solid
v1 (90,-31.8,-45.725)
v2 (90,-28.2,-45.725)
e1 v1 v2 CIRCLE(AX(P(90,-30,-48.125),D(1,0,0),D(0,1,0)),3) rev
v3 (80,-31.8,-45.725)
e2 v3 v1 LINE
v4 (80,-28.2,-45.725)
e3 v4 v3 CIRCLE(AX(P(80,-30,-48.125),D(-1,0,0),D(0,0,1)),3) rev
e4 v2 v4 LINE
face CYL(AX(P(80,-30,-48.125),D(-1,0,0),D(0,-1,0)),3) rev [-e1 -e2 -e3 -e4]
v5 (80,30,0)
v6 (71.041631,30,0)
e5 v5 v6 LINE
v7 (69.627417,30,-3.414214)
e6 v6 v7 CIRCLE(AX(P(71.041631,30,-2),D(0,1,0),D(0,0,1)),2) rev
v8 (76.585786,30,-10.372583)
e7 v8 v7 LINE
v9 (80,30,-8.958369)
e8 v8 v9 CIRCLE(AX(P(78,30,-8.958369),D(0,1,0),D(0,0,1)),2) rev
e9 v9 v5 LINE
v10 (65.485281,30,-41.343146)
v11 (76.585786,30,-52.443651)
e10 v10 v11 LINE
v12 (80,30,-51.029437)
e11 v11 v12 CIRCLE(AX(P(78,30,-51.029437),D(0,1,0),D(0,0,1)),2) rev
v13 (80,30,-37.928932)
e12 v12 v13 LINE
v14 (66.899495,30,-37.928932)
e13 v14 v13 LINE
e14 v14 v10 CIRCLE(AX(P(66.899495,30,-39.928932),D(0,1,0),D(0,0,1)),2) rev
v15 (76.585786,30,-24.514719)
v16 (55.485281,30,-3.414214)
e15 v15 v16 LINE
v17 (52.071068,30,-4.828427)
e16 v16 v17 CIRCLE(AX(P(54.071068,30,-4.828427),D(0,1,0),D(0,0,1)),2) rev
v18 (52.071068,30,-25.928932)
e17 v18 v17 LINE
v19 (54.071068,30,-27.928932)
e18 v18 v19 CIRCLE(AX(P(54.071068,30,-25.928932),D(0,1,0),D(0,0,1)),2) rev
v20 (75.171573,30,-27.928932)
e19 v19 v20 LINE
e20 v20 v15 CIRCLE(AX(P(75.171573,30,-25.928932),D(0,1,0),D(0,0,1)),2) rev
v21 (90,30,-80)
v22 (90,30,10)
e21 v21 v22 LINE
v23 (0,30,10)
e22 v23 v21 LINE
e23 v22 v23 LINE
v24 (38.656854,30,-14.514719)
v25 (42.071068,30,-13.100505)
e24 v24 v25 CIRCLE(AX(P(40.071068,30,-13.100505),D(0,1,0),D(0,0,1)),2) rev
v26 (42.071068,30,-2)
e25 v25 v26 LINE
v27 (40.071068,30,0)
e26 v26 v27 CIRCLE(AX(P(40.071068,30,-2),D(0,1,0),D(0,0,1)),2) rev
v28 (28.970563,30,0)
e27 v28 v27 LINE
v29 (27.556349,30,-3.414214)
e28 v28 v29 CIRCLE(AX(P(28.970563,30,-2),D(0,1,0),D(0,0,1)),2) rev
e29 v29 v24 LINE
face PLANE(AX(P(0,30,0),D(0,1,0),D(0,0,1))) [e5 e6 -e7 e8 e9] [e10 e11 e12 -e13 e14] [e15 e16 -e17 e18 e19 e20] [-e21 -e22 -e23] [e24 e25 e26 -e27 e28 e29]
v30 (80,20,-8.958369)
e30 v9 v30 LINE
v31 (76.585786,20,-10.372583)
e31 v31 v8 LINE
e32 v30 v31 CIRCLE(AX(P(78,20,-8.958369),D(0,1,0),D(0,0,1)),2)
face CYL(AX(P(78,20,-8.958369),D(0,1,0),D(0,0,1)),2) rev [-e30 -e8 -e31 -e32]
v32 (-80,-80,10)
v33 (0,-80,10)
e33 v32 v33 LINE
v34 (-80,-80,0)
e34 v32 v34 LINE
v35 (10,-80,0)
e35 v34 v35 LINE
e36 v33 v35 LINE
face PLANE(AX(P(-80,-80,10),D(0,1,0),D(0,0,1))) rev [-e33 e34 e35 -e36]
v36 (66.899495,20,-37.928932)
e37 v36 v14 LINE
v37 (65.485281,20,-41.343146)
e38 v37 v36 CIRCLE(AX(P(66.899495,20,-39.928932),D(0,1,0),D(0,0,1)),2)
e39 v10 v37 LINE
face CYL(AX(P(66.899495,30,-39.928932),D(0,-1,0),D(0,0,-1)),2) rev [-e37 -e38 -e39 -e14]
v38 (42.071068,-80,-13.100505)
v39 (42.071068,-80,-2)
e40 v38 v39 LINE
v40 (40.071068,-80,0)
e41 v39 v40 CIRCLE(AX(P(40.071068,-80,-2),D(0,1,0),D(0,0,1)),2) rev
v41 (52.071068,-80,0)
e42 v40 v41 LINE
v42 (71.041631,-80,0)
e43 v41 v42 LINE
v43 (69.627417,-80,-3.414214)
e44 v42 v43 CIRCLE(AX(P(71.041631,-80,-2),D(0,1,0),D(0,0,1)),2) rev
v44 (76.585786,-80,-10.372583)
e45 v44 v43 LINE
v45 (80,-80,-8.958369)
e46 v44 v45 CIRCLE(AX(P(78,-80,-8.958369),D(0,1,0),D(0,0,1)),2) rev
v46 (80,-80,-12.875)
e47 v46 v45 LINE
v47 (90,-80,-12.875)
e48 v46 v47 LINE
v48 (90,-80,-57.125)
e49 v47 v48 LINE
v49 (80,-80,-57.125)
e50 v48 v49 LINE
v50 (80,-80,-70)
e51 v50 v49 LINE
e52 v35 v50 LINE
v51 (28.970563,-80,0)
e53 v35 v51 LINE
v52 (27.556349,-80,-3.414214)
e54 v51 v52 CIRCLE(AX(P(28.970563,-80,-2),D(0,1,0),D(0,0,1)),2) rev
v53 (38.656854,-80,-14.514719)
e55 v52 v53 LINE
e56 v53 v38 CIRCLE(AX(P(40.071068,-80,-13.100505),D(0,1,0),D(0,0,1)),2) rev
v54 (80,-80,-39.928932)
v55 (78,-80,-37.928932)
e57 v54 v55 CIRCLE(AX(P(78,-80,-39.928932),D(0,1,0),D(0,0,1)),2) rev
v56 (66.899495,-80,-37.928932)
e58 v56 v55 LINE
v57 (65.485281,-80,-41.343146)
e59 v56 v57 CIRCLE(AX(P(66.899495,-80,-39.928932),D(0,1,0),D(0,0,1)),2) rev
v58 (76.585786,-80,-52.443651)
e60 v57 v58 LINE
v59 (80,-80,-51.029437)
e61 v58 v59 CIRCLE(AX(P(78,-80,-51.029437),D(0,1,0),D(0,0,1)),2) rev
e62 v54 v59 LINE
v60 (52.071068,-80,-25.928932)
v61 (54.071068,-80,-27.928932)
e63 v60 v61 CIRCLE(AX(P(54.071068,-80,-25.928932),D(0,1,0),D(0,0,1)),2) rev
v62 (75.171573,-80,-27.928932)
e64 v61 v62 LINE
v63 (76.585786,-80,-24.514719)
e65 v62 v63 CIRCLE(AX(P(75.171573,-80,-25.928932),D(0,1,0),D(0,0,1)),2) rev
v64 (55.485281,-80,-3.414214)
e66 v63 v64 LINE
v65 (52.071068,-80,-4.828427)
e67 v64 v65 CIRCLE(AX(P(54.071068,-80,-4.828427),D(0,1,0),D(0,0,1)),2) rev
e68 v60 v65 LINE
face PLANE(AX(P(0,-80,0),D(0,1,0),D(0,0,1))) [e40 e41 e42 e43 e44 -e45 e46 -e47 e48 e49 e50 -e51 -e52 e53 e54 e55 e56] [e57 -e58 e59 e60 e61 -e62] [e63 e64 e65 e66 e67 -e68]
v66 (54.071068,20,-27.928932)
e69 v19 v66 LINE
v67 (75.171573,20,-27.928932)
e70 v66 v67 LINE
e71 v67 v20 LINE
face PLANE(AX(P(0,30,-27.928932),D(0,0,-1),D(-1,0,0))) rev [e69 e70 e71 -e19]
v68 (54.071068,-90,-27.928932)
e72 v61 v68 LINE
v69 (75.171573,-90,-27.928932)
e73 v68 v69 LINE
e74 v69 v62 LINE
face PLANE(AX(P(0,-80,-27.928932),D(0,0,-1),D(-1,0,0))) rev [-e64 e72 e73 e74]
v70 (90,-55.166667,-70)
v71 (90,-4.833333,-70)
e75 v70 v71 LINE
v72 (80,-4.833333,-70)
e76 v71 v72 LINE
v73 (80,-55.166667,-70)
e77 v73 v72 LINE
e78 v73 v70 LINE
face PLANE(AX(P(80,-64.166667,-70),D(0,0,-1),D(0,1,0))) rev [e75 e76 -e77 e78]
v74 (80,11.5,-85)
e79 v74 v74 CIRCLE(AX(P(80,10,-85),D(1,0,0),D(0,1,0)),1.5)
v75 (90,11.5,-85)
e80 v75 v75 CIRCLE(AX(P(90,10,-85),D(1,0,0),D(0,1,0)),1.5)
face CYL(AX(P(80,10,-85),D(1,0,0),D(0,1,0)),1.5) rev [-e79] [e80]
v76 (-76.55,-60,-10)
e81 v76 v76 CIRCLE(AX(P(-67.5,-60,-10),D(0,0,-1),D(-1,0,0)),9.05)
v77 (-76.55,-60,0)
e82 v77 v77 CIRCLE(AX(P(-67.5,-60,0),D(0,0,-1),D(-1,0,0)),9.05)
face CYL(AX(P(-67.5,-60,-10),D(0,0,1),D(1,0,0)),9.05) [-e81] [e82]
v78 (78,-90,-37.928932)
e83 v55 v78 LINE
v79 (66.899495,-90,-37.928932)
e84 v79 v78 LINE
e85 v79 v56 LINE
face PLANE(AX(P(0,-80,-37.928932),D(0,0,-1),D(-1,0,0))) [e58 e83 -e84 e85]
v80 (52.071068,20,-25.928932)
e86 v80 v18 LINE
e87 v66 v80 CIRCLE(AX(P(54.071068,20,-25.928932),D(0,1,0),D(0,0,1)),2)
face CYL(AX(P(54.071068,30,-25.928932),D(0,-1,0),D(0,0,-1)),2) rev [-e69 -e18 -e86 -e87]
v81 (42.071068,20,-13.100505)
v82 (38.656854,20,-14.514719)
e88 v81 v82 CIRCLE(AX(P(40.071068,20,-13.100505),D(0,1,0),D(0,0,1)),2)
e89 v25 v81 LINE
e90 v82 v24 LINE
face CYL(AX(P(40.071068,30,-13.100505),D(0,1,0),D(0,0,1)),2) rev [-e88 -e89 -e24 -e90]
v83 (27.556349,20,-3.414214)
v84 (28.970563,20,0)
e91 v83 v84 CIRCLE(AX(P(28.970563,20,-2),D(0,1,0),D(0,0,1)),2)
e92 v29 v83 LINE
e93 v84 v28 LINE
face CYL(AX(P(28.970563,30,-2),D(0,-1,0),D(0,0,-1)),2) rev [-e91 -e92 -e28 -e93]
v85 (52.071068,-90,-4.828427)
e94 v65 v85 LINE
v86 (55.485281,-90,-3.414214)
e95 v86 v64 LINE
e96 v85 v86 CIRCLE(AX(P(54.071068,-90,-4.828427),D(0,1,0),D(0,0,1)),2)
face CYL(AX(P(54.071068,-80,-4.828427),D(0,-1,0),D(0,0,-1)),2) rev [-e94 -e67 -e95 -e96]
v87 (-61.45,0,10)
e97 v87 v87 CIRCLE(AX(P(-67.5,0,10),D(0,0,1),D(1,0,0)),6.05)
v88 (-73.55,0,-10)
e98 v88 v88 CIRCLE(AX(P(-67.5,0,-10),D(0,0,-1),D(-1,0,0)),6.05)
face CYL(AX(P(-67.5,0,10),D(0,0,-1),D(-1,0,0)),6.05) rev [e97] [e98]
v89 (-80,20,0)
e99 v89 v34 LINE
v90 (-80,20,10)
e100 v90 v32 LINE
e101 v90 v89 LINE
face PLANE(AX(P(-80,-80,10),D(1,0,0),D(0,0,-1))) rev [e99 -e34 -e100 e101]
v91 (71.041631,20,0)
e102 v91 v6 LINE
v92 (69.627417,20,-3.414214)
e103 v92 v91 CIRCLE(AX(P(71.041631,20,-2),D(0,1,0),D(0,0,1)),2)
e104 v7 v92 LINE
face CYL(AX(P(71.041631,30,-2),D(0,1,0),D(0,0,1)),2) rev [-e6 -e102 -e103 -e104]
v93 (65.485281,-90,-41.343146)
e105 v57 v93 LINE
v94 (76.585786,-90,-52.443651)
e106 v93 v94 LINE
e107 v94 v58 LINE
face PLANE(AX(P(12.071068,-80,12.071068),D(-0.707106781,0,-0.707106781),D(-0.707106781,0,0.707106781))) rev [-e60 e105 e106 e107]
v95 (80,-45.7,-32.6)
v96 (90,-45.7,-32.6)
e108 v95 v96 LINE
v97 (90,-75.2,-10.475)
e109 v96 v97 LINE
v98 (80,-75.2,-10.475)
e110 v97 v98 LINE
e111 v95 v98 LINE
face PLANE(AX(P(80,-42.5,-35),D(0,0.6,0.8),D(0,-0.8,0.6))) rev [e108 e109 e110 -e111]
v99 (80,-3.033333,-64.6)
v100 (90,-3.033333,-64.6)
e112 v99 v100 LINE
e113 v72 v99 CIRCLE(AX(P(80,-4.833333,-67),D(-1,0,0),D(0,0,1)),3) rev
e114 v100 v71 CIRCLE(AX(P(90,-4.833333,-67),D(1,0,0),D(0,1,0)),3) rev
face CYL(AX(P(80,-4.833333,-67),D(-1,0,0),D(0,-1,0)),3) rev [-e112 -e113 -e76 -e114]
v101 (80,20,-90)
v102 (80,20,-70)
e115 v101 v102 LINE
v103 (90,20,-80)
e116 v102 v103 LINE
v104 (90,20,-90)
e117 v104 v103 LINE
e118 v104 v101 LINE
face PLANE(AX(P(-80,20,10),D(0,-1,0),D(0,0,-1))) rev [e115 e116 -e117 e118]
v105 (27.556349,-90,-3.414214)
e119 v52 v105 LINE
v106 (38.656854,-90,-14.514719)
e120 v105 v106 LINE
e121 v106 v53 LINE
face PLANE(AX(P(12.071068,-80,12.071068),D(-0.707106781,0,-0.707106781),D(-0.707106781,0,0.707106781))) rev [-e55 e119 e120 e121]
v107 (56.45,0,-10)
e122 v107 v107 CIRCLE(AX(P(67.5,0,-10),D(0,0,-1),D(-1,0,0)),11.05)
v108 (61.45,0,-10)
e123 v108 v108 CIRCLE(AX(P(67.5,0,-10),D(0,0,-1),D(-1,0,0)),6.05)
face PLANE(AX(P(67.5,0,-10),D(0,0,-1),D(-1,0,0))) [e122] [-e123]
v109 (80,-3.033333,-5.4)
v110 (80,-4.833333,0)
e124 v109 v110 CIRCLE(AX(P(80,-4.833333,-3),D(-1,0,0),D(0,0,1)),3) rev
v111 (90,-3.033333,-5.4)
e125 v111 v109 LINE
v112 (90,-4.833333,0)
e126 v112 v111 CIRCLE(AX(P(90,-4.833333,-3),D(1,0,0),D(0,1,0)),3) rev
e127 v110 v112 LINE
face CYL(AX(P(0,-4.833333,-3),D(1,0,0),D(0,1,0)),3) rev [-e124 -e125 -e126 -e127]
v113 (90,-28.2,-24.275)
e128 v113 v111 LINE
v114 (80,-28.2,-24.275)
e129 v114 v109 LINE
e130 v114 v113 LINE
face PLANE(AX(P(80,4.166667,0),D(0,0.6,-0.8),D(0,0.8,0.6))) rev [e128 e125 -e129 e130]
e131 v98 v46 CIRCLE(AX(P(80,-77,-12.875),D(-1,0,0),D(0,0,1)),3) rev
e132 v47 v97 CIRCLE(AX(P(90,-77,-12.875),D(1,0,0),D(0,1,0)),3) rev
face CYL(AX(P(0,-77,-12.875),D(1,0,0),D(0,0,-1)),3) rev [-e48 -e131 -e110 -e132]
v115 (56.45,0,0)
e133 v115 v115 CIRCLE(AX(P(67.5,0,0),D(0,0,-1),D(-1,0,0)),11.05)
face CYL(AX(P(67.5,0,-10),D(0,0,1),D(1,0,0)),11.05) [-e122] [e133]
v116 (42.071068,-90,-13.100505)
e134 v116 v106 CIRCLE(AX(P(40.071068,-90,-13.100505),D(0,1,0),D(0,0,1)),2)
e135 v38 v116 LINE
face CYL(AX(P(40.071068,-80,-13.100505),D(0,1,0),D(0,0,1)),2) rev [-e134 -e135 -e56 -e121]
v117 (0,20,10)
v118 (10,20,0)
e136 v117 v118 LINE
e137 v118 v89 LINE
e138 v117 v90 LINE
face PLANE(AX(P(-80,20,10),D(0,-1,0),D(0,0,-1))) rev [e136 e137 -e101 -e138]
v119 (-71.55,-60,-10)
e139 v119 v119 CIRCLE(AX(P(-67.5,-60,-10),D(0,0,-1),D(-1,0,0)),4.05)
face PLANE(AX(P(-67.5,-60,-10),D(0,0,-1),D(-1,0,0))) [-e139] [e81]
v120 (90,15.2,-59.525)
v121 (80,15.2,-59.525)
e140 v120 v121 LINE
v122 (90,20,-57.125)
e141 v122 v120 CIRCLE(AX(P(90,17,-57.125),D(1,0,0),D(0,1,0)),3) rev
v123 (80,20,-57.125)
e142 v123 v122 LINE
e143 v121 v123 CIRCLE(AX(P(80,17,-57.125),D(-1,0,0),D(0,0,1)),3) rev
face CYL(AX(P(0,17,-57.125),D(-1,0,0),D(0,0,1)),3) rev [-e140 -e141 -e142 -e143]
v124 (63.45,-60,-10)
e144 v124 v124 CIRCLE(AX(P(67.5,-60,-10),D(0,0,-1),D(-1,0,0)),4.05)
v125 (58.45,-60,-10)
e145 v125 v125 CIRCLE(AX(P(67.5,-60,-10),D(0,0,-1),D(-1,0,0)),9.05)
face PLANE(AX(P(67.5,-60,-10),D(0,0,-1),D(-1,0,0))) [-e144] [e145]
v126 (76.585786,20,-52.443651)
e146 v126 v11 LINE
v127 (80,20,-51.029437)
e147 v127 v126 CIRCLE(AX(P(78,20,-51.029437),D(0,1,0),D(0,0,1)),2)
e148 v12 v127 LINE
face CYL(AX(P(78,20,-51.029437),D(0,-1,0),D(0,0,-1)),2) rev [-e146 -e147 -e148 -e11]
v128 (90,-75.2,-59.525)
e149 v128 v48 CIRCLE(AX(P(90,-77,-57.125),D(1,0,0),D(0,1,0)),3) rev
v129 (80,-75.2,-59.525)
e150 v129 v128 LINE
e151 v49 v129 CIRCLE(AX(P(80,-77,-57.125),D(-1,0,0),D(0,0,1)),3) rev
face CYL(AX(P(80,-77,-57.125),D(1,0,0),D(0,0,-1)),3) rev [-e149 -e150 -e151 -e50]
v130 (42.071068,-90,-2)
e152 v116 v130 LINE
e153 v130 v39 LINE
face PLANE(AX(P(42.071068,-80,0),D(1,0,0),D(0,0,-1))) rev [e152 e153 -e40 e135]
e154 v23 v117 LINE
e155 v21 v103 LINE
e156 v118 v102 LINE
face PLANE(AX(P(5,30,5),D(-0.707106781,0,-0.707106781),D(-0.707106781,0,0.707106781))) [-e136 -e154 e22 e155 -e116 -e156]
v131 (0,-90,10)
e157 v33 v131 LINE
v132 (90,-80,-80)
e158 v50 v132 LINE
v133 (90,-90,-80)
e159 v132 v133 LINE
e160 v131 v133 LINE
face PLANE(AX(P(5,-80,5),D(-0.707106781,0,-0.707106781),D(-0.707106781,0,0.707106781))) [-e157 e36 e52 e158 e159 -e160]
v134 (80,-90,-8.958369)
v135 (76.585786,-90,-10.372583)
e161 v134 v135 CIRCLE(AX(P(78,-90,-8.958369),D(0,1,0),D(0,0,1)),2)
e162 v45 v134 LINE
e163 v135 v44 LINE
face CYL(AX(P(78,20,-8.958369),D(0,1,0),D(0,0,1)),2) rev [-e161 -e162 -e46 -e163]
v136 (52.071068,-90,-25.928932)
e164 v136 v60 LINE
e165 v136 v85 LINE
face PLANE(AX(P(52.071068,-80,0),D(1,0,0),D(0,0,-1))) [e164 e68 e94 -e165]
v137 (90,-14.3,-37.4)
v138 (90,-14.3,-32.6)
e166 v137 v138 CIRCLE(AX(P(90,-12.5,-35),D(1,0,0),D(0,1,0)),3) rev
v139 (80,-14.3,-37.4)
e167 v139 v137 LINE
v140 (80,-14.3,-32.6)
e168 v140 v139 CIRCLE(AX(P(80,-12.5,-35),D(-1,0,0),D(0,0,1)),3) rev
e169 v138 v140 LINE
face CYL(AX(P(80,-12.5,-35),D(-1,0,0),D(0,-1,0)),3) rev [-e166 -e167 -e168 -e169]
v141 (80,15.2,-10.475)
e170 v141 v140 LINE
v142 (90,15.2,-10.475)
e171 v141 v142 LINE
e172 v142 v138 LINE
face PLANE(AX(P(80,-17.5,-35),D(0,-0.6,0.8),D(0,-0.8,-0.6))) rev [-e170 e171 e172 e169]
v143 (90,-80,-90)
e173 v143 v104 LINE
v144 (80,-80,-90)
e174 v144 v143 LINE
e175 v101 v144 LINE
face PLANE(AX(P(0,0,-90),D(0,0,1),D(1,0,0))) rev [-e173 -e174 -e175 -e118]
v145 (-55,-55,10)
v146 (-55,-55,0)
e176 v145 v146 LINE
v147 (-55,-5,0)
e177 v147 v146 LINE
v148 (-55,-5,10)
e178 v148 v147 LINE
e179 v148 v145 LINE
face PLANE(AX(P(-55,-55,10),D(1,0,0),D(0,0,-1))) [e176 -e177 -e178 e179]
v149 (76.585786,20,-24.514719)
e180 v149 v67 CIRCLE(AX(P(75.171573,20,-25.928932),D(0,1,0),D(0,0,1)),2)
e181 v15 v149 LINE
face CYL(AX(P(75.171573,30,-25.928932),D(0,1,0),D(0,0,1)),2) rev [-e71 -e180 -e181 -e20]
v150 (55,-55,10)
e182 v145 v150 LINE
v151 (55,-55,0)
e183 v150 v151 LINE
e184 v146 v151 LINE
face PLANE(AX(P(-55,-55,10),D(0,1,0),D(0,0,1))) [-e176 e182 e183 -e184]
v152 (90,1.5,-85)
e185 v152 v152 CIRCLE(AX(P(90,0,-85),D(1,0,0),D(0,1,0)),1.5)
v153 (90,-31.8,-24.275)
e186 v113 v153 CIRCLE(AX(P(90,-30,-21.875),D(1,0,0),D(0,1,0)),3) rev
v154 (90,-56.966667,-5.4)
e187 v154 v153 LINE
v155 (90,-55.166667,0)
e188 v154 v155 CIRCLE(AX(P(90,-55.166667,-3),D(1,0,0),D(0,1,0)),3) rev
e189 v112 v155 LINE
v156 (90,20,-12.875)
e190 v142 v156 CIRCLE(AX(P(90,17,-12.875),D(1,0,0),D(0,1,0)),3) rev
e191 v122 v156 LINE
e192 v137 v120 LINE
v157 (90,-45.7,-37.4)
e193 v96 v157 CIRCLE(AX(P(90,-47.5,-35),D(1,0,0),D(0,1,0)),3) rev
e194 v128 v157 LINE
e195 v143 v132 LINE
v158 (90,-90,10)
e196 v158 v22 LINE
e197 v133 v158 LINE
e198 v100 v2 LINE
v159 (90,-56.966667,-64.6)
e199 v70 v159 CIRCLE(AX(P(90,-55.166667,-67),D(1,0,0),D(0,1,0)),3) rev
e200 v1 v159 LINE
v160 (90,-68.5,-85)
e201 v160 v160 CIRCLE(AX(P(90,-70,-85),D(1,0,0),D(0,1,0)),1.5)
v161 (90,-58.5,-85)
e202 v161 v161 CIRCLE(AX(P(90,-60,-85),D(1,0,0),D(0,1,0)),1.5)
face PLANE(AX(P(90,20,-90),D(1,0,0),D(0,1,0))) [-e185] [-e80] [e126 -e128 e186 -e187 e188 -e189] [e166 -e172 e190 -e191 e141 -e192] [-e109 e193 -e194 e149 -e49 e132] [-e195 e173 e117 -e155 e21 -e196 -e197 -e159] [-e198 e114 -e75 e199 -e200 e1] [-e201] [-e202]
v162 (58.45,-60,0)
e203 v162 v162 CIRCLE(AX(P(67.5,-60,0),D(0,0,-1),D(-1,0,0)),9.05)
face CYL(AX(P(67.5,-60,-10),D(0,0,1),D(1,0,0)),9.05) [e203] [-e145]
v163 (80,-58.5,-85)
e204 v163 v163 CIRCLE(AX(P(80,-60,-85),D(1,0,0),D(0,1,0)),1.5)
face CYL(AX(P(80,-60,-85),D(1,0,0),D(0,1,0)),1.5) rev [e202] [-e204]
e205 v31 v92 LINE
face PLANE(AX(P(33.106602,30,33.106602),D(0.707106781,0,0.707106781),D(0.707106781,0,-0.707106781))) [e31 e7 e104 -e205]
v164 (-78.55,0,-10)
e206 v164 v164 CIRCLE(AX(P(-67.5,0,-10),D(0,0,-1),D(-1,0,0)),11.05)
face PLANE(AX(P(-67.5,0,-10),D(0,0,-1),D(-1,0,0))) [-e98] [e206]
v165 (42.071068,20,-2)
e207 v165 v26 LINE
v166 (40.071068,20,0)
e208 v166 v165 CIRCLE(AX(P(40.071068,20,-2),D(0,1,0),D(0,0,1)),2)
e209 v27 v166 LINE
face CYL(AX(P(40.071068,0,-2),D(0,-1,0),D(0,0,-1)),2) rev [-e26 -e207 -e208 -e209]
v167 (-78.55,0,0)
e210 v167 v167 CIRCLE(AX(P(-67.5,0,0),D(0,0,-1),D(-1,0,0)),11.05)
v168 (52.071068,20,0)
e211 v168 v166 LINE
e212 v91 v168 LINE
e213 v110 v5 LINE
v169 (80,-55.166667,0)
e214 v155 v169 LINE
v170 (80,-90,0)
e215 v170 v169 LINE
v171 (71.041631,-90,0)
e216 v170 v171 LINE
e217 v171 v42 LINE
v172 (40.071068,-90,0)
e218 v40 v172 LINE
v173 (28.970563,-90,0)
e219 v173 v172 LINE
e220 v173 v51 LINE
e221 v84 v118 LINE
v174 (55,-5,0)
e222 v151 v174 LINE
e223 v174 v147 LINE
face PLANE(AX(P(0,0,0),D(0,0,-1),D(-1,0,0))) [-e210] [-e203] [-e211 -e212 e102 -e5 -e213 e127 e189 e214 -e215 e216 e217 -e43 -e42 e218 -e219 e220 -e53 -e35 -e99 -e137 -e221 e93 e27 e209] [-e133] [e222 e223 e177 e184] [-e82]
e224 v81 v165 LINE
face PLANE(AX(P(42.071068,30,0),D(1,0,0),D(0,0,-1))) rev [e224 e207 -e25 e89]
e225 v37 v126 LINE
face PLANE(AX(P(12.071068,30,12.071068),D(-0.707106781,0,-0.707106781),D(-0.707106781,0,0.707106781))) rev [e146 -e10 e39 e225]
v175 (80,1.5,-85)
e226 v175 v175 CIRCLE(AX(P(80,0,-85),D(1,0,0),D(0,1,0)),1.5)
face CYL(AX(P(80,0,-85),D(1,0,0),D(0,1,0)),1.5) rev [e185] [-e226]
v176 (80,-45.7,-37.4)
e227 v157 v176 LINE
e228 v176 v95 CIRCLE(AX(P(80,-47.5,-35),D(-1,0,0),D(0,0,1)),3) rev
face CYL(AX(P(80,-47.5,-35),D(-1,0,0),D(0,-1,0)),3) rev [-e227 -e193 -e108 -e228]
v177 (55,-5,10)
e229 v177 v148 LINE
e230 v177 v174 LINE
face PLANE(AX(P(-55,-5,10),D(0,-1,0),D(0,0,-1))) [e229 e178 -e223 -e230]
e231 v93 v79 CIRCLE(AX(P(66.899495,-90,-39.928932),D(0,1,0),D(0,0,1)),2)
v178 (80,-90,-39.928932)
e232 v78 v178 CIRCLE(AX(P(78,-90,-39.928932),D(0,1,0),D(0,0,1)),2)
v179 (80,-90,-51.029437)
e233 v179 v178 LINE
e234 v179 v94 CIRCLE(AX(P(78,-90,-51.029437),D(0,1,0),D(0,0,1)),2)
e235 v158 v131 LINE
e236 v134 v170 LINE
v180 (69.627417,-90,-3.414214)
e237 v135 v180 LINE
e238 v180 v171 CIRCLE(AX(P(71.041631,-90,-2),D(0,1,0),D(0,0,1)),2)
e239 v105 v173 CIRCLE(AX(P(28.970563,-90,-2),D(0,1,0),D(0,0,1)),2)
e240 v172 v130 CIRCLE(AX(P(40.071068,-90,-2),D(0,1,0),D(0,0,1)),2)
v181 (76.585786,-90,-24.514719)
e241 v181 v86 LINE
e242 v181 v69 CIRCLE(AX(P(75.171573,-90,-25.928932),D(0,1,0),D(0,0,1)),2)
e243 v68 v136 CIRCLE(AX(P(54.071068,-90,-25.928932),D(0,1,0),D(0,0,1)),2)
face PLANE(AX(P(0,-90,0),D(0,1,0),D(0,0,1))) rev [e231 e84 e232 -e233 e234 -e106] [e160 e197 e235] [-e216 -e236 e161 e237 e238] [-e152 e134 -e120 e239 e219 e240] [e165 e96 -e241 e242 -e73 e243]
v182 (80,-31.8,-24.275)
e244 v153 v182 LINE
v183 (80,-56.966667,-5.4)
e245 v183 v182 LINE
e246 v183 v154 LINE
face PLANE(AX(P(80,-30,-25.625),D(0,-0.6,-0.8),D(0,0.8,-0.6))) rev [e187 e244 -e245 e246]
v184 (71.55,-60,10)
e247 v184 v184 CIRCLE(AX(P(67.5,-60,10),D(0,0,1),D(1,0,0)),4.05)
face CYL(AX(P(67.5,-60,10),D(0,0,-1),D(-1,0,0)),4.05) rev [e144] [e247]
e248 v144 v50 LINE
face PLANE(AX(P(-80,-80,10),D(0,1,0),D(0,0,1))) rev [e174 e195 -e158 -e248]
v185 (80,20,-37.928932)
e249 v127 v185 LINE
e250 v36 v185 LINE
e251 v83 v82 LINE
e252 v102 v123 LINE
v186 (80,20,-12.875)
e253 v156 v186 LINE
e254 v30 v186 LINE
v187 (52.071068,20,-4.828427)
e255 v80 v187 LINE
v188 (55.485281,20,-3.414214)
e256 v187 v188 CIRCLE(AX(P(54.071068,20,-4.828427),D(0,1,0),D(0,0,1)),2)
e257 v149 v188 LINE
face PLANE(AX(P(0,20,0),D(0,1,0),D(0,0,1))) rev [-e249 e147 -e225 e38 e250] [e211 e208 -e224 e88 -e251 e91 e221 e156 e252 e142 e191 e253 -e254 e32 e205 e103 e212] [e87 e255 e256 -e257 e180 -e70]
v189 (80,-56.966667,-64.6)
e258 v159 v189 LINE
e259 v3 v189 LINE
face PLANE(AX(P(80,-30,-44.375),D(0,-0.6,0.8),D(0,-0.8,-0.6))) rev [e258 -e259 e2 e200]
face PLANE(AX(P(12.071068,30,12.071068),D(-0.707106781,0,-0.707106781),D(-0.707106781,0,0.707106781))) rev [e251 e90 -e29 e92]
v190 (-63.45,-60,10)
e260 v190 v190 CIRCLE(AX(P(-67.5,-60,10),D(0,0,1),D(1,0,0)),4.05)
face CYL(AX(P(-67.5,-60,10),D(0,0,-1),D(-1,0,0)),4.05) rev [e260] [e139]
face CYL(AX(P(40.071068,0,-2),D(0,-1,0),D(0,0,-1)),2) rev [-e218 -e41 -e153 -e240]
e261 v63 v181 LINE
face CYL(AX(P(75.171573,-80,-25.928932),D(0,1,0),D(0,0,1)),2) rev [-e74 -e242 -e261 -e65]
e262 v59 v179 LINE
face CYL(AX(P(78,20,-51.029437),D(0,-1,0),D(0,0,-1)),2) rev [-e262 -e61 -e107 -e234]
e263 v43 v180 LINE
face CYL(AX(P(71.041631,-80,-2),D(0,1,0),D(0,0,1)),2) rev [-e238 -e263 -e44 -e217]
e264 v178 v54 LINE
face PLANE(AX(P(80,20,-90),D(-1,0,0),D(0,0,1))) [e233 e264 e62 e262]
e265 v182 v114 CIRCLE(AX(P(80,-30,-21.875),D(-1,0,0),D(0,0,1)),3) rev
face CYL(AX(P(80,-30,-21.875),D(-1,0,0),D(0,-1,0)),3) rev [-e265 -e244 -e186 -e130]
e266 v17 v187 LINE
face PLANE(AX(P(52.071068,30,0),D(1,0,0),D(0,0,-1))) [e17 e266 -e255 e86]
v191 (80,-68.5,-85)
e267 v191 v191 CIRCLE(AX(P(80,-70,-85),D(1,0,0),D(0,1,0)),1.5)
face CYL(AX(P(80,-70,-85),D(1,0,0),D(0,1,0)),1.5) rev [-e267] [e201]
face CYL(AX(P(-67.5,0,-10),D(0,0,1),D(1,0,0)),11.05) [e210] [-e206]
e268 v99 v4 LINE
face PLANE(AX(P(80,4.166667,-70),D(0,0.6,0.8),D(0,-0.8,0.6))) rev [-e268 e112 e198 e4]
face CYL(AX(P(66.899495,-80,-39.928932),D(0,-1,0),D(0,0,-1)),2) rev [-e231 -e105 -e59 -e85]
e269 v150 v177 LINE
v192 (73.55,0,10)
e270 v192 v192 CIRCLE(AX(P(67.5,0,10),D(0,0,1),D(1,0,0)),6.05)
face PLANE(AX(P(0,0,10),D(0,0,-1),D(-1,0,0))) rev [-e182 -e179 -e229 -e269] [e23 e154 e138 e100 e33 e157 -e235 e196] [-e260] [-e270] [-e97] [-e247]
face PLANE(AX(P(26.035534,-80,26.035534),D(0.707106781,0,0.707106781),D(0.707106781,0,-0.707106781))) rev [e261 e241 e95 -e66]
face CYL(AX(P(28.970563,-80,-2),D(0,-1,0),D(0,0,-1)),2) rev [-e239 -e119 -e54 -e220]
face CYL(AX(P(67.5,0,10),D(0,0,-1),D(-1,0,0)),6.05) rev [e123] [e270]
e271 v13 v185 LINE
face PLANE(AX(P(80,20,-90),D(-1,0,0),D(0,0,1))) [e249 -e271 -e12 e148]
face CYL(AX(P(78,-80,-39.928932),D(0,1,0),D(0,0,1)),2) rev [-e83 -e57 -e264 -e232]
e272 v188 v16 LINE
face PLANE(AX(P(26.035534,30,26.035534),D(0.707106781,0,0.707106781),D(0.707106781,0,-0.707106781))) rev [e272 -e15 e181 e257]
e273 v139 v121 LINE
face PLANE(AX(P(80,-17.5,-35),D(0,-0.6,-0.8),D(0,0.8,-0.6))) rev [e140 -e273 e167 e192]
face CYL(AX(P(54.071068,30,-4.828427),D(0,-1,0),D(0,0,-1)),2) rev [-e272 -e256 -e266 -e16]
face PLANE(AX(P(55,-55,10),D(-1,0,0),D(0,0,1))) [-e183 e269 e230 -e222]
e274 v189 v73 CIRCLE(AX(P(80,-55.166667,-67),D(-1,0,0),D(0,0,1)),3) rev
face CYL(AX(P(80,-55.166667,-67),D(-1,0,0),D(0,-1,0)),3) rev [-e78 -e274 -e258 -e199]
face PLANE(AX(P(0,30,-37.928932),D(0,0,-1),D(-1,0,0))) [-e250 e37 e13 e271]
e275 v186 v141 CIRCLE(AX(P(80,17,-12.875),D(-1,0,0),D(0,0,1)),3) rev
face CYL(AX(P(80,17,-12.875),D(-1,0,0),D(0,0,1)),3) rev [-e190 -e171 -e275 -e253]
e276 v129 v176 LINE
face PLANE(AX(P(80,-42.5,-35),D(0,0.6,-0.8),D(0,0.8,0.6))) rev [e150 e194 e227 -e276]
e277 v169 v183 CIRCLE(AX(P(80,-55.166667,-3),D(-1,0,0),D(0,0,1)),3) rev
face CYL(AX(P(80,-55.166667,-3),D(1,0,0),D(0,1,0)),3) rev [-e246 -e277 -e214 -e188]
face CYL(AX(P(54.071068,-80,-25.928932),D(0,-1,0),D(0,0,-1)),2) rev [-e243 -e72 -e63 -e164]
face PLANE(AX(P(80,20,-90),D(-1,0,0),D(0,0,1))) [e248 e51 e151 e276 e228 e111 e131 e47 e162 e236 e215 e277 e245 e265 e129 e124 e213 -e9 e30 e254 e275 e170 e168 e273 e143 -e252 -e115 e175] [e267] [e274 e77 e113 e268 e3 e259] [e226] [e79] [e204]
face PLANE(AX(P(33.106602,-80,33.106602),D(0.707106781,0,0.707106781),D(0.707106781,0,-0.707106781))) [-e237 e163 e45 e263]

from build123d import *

# Parameters (mm, degrees)
SKETCH1_W            = 160
SKETCH1_H            = 100
SKETCH1_R            = 6.05
SKETCH1_R_2          = 4.05
SKETCH1_W_2          = 110
SKETCH1_H_2          = 50
BOSS_EXTRUDE1_DEPTH  = 10
SKETCH4_W            = 10
SKETCH4_H            = 100
BOSS_EXTRUDE3_DEPTH  = 100
BOSS_EXTRUDE4_DEPTH  = 5
BOSS_EXTRUDE5_DEPTH  = 10
CUT_EXTRUDE1_DEPTH   = 10
FILLET1_R            = 3
FILLET2_R            = 2
SKETCH13_R           = 1.5
CUT_EXTRUDE2_DEPTH   = 10
BOSS_EXTRUDE10_START = 10
SKETCH14_R           = 11.05
SKETCH14_R_2         = 6.05
SKETCH14_R_3         = 9.05
SKETCH14_R_4         = 4.05
BOSS_EXTRUDE10_DEPTH = 10


with BuildPart() as part:
    # Sketch1 → Boss-Extrude1 (new body)
    with BuildSketch(Plane.XY):
        with Locations((0, -30)):
            Rectangle(SKETCH1_W, SKETCH1_H)
        with Locations((-67.5, 0)):
            Circle(SKETCH1_R, mode=Mode.SUBTRACT)
        with Locations((67.5, 0)):
            Circle(SKETCH1_R, mode=Mode.SUBTRACT)
        with Locations((67.5, -60)):
            Circle(SKETCH1_R_2, mode=Mode.SUBTRACT)
        with Locations((-67.5, -60)):
            Circle(SKETCH1_R_2, mode=Mode.SUBTRACT)
        with Locations((0, -30)):
            Rectangle(SKETCH1_W_2, SKETCH1_H_2, mode=Mode.SUBTRACT)
    extrude(amount=BOSS_EXTRUDE1_DEPTH)

    # Sketch4 → Boss-Extrude3 (add)
    with BuildSketch(Plane.XY.offset(10)):
        with Locations((85, -30)):
            Rectangle(SKETCH4_W, SKETCH4_H)
    extrude(amount=-BOSS_EXTRUDE3_DEPTH)

    # Sketch6 → Boss-Extrude4 (add, symmetric)
    with BuildSketch(Plane(origin=(0, 25, 0), x_dir=(1, 0, 0), z_dir=(0, 1, 0))):
        Polygon((90, -10), (90, 80), (0, -10), align=None)
        Polygon((42.071067812, 0), (24.142135624, 0), (42.071067812, 17.928932188), align=None, mode=Mode.SUBTRACT)
        Polygon((80, 0), (66.213203436, 0), (80, 13.786796564), align=None, mode=Mode.SUBTRACT)
        Polygon((52.071067812, 27.928932188), (80, 27.928932188), (52.071067812, 0), align=None, mode=Mode.SUBTRACT)
        Polygon((62.071067812, 37.928932188), (80, 55.857864376), (80, 37.928932188), align=None, mode=Mode.SUBTRACT)
    extrude(amount=BOSS_EXTRUDE4_DEPTH, both=True)

    # Sketch9 → Boss-Extrude5 (add)
    with BuildSketch(Plane(origin=(0, -90, 0), x_dir=(1, 0, 0), z_dir=(0, 1, 0))):
        Polygon((90, -10), (90, 80), (0, -10), align=None)
        Polygon((24.142135624, 0), (42.071067812, 17.928932188), (42.071067812, 0), align=None, mode=Mode.SUBTRACT)
        Polygon((80, 0), (66.213203436, 0), (80, 13.786796564), align=None, mode=Mode.SUBTRACT)
        Polygon((80, 27.928932188), (52.071067812, 0), (52.071067812, 27.928932188), align=None, mode=Mode.SUBTRACT)
        Polygon((80, 37.928932188), (62.071067812, 37.928932188), (80, 55.857864376), align=None, mode=Mode.SUBTRACT)
    extrude(amount=BOSS_EXTRUDE5_DEPTH)

    # Sketch12 → Cut-Extrude1 (cut)
    with BuildSketch(Plane(origin=(90, 0, 0), x_dir=(0, 0, -1), z_dir=(1, 0, 0))):
        Polygon((25.625, -30), (0, -64.166666667), (0, 4.166666667), align=None)
        Polygon((35, -17.5), (6.875, 20), (63.125, 20), align=None)
        Polygon((35, -42.5), (6.875, -80), (63.125, -80), align=None)
        Polygon((70, -64.166666667), (70, 4.166666667), (44.375, -30), align=None)
    extrude(amount=-CUT_EXTRUDE1_DEPTH, mode=Mode.SUBTRACT)

    # Fillet1
    fillet1_edges = [part.edges().sort_by_distance(p)[0] for p in [
        (85, -42.5, -35),
        (85, -80, -63.125),
        (85, -80, -6.875),
        (85, 20, -63.125),
        (85, -17.5, -35),
        (85, 20, -6.875),
        (85, -64.166666667, -70),
        (85, -30, -44.375),
        (85, 4.166666667, -70),
        (85, 4.166666667, 0),
        (85, -30, -25.625),
        (85, -64.166666667, 0),
    ]]
    fillet(fillet1_edges, radius=FILLET1_R)

    # Fillet2
    # the kernel refuses this fillet: 2 mm, written as the material it adds along each edge
    with BuildSketch(Plane(origin=(62.071067812, -90, -37.928932188), x_dir=(0.7071067811865511, 0, -0.7071067811865438), z_dir=(0, 1, 0)), Plane(origin=(80, -90, -55.857864376), x_dir=(0, 0, 1), z_dir=(0, 1, 0)), Plane(origin=(52.071067812, -90, 0), x_dir=(0, 0, -1), z_dir=(0, 1, 0)), Plane(origin=(42.071067812, -90, -17.928932188), x_dir=(0, 0, 1), z_dir=(0, 1, 0)), Plane(origin=(80, 20, -27.928932188), x_dir=(-0.7071067811865523, 0, 0.7071067811865427), z_dir=(0, 1, 0)), Plane(origin=(52.071067812, 30, 0), x_dir=(0.7071067811865515, 0, -0.7071067811865436), z_dir=(0, -1, 0))) as fillet2_piece_1:
        with BuildLine():
            CenterArc((FILLET2_R * 2.41421356237, -FILLET2_R), FILLET2_R, 90, 135)
            Line((FILLET2_R * 1.70710678119, -FILLET2_R * 1.70710678119), (0, 0))
            Line((0, 0), (FILLET2_R * 2.41421356237, 0))
        make_face()
    extrude(amount=10)
    with BuildSketch(Plane(origin=(80, -90, -27.928932188), x_dir=(-1, 0, 0), z_dir=(0, 1, 0)), Plane(origin=(24.142135624, -90, 0), x_dir=(1, 0, 0), z_dir=(0, 1, 0)), Plane(origin=(66.213203436, -90, 0), x_dir=(1, 0, 0), z_dir=(0, 1, 0)), Plane(origin=(80, -90, -13.786796564), x_dir=(-0.7071067811865519, 0, 0.7071067811865431), z_dir=(0, 1, 0)), Plane(origin=(62.071067812, 30, -37.928932188), x_dir=(0.7071067811865511, 0, -0.7071067811865438), z_dir=(0, -1, 0)), Plane(origin=(24.142135624, 20, 0), x_dir=(1, 0, 0), z_dir=(0, 1, 0)), Plane(origin=(66.213203436, 20, 0), x_dir=(1, 0, 0), z_dir=(0, 1, 0)), Plane(origin=(80, 20, -55.857864376), x_dir=(-0.7071067811865505, 0, 0.7071067811865446), z_dir=(0, 1, 0)), Plane(origin=(42.071067812, 20, -17.928932188), x_dir=(-0.7071067811865515, 0, 0.7071067811865437), z_dir=(0, 1, 0)), Plane(origin=(80, 20, -13.786796564), x_dir=(-0.7071067811865519, 0, 0.7071067811865431), z_dir=(0, 1, 0))) as fillet2_piece_2:
        with BuildLine():
            CenterArc((FILLET2_R * 2.41421356237, FILLET2_R), FILLET2_R, 135, 135)
            Line((FILLET2_R * 1.70710678119, FILLET2_R * 1.70710678119), (0, 0))
            Line((0, 0), (FILLET2_R * 2.41421356237, 0))
        make_face()
    extrude(amount=10)
    with BuildSketch(Plane(origin=(42.071067812, -90, 0), x_dir=(-1, 0, 0), z_dir=(0, 1, 0)), Plane(origin=(52.071067812, -90, -27.928932188), x_dir=(1, 0, 0), z_dir=(0, 1, 0)), Plane(origin=(52.071067812, 20, -27.928932188), x_dir=(1, 0, 0), z_dir=(0, 1, 0))) as fillet2_piece_3:
        with BuildLine():
            CenterArc((FILLET2_R, -FILLET2_R), FILLET2_R, 90, 90)
            Line((0, -FILLET2_R), (0, 0))
            Line((0, 0), (FILLET2_R, 0))
        make_face()
    extrude(amount=10)
    with BuildSketch(Plane(origin=(80, -90, -37.928932188), x_dir=(0, 0, -1), z_dir=(0, 1, 0)), Plane(origin=(42.071067812, 30, 0), x_dir=(-1, 0, 0), z_dir=(0, -1, 0))) as fillet2_piece_4:
        with BuildLine():
            CenterArc((FILLET2_R, FILLET2_R), FILLET2_R, 180, 90)
            Line((0, FILLET2_R), (0, 0))
            Line((0, 0), (FILLET2_R, 0))
        make_face()
    extrude(amount=10)

    # Sketch13 → Cut-Extrude2 (cut)
    with BuildSketch(Plane(origin=(90, 0, 0), x_dir=(0, 0, -1), z_dir=(1, 0, 0))):
        with Locations(Location((85, 10, 0), (0, 0, 90))):
            Circle(SKETCH13_R)
        with Locations(Location((85, 0, 0), (0, 0, 90))):
            Circle(SKETCH13_R)
        with Locations(Location((85, -60, 0), (0, 0, 90))):
            Circle(SKETCH13_R)
        with Locations(Location((85, -70, 0), (0, 0, 90))):
            Circle(SKETCH13_R)
    extrude(amount=-CUT_EXTRUDE2_DEPTH, mode=Mode.SUBTRACT)

    # Sketch14 → Boss-Extrude10 (add)
    # profile 1 of 4: a face of its own
    with BuildSketch(Plane(origin=(0, 0, 0), x_dir=(-1, 0, 0), z_dir=(0, 0, -1)).offset(BOSS_EXTRUDE10_START)):
        with Locations((-67.5, 0)):
            Circle(SKETCH14_R)
        with Locations((-67.5, 0)):
            Circle(SKETCH14_R_2, mode=Mode.SUBTRACT)
    # profile 2 of 4: a face of its own
    with BuildSketch(Plane(origin=(0, 0, 0), x_dir=(-1, 0, 0), z_dir=(0, 0, -1)).offset(BOSS_EXTRUDE10_START)):
        with Locations((67.5, 0)):
            Circle(SKETCH14_R)
        with Locations((67.5, 0)):
            Circle(SKETCH14_R_2, mode=Mode.SUBTRACT)
    # profile 3 of 4: a face of its own
    with BuildSketch(Plane(origin=(0, 0, 0), x_dir=(-1, 0, 0), z_dir=(0, 0, -1)).offset(BOSS_EXTRUDE10_START)):
        with Locations((67.5, -60)):
            Circle(SKETCH14_R_3)
        with Locations((67.5, -60)):
            Circle(SKETCH14_R_4, mode=Mode.SUBTRACT)
    # profile 4 of 4: a face of its own
    with BuildSketch(Plane(origin=(0, 0, 0), x_dir=(-1, 0, 0), z_dir=(0, 0, -1)).offset(BOSS_EXTRUDE10_START)):
        with Locations((-67.5, -60)):
            Circle(SKETCH14_R_3)
        with Locations((-67.5, -60)):
            Circle(SKETCH14_R_4, mode=Mode.SUBTRACT)
    extrude(amount=-BOSS_EXTRUDE10_DEPTH)


solid = part.part
